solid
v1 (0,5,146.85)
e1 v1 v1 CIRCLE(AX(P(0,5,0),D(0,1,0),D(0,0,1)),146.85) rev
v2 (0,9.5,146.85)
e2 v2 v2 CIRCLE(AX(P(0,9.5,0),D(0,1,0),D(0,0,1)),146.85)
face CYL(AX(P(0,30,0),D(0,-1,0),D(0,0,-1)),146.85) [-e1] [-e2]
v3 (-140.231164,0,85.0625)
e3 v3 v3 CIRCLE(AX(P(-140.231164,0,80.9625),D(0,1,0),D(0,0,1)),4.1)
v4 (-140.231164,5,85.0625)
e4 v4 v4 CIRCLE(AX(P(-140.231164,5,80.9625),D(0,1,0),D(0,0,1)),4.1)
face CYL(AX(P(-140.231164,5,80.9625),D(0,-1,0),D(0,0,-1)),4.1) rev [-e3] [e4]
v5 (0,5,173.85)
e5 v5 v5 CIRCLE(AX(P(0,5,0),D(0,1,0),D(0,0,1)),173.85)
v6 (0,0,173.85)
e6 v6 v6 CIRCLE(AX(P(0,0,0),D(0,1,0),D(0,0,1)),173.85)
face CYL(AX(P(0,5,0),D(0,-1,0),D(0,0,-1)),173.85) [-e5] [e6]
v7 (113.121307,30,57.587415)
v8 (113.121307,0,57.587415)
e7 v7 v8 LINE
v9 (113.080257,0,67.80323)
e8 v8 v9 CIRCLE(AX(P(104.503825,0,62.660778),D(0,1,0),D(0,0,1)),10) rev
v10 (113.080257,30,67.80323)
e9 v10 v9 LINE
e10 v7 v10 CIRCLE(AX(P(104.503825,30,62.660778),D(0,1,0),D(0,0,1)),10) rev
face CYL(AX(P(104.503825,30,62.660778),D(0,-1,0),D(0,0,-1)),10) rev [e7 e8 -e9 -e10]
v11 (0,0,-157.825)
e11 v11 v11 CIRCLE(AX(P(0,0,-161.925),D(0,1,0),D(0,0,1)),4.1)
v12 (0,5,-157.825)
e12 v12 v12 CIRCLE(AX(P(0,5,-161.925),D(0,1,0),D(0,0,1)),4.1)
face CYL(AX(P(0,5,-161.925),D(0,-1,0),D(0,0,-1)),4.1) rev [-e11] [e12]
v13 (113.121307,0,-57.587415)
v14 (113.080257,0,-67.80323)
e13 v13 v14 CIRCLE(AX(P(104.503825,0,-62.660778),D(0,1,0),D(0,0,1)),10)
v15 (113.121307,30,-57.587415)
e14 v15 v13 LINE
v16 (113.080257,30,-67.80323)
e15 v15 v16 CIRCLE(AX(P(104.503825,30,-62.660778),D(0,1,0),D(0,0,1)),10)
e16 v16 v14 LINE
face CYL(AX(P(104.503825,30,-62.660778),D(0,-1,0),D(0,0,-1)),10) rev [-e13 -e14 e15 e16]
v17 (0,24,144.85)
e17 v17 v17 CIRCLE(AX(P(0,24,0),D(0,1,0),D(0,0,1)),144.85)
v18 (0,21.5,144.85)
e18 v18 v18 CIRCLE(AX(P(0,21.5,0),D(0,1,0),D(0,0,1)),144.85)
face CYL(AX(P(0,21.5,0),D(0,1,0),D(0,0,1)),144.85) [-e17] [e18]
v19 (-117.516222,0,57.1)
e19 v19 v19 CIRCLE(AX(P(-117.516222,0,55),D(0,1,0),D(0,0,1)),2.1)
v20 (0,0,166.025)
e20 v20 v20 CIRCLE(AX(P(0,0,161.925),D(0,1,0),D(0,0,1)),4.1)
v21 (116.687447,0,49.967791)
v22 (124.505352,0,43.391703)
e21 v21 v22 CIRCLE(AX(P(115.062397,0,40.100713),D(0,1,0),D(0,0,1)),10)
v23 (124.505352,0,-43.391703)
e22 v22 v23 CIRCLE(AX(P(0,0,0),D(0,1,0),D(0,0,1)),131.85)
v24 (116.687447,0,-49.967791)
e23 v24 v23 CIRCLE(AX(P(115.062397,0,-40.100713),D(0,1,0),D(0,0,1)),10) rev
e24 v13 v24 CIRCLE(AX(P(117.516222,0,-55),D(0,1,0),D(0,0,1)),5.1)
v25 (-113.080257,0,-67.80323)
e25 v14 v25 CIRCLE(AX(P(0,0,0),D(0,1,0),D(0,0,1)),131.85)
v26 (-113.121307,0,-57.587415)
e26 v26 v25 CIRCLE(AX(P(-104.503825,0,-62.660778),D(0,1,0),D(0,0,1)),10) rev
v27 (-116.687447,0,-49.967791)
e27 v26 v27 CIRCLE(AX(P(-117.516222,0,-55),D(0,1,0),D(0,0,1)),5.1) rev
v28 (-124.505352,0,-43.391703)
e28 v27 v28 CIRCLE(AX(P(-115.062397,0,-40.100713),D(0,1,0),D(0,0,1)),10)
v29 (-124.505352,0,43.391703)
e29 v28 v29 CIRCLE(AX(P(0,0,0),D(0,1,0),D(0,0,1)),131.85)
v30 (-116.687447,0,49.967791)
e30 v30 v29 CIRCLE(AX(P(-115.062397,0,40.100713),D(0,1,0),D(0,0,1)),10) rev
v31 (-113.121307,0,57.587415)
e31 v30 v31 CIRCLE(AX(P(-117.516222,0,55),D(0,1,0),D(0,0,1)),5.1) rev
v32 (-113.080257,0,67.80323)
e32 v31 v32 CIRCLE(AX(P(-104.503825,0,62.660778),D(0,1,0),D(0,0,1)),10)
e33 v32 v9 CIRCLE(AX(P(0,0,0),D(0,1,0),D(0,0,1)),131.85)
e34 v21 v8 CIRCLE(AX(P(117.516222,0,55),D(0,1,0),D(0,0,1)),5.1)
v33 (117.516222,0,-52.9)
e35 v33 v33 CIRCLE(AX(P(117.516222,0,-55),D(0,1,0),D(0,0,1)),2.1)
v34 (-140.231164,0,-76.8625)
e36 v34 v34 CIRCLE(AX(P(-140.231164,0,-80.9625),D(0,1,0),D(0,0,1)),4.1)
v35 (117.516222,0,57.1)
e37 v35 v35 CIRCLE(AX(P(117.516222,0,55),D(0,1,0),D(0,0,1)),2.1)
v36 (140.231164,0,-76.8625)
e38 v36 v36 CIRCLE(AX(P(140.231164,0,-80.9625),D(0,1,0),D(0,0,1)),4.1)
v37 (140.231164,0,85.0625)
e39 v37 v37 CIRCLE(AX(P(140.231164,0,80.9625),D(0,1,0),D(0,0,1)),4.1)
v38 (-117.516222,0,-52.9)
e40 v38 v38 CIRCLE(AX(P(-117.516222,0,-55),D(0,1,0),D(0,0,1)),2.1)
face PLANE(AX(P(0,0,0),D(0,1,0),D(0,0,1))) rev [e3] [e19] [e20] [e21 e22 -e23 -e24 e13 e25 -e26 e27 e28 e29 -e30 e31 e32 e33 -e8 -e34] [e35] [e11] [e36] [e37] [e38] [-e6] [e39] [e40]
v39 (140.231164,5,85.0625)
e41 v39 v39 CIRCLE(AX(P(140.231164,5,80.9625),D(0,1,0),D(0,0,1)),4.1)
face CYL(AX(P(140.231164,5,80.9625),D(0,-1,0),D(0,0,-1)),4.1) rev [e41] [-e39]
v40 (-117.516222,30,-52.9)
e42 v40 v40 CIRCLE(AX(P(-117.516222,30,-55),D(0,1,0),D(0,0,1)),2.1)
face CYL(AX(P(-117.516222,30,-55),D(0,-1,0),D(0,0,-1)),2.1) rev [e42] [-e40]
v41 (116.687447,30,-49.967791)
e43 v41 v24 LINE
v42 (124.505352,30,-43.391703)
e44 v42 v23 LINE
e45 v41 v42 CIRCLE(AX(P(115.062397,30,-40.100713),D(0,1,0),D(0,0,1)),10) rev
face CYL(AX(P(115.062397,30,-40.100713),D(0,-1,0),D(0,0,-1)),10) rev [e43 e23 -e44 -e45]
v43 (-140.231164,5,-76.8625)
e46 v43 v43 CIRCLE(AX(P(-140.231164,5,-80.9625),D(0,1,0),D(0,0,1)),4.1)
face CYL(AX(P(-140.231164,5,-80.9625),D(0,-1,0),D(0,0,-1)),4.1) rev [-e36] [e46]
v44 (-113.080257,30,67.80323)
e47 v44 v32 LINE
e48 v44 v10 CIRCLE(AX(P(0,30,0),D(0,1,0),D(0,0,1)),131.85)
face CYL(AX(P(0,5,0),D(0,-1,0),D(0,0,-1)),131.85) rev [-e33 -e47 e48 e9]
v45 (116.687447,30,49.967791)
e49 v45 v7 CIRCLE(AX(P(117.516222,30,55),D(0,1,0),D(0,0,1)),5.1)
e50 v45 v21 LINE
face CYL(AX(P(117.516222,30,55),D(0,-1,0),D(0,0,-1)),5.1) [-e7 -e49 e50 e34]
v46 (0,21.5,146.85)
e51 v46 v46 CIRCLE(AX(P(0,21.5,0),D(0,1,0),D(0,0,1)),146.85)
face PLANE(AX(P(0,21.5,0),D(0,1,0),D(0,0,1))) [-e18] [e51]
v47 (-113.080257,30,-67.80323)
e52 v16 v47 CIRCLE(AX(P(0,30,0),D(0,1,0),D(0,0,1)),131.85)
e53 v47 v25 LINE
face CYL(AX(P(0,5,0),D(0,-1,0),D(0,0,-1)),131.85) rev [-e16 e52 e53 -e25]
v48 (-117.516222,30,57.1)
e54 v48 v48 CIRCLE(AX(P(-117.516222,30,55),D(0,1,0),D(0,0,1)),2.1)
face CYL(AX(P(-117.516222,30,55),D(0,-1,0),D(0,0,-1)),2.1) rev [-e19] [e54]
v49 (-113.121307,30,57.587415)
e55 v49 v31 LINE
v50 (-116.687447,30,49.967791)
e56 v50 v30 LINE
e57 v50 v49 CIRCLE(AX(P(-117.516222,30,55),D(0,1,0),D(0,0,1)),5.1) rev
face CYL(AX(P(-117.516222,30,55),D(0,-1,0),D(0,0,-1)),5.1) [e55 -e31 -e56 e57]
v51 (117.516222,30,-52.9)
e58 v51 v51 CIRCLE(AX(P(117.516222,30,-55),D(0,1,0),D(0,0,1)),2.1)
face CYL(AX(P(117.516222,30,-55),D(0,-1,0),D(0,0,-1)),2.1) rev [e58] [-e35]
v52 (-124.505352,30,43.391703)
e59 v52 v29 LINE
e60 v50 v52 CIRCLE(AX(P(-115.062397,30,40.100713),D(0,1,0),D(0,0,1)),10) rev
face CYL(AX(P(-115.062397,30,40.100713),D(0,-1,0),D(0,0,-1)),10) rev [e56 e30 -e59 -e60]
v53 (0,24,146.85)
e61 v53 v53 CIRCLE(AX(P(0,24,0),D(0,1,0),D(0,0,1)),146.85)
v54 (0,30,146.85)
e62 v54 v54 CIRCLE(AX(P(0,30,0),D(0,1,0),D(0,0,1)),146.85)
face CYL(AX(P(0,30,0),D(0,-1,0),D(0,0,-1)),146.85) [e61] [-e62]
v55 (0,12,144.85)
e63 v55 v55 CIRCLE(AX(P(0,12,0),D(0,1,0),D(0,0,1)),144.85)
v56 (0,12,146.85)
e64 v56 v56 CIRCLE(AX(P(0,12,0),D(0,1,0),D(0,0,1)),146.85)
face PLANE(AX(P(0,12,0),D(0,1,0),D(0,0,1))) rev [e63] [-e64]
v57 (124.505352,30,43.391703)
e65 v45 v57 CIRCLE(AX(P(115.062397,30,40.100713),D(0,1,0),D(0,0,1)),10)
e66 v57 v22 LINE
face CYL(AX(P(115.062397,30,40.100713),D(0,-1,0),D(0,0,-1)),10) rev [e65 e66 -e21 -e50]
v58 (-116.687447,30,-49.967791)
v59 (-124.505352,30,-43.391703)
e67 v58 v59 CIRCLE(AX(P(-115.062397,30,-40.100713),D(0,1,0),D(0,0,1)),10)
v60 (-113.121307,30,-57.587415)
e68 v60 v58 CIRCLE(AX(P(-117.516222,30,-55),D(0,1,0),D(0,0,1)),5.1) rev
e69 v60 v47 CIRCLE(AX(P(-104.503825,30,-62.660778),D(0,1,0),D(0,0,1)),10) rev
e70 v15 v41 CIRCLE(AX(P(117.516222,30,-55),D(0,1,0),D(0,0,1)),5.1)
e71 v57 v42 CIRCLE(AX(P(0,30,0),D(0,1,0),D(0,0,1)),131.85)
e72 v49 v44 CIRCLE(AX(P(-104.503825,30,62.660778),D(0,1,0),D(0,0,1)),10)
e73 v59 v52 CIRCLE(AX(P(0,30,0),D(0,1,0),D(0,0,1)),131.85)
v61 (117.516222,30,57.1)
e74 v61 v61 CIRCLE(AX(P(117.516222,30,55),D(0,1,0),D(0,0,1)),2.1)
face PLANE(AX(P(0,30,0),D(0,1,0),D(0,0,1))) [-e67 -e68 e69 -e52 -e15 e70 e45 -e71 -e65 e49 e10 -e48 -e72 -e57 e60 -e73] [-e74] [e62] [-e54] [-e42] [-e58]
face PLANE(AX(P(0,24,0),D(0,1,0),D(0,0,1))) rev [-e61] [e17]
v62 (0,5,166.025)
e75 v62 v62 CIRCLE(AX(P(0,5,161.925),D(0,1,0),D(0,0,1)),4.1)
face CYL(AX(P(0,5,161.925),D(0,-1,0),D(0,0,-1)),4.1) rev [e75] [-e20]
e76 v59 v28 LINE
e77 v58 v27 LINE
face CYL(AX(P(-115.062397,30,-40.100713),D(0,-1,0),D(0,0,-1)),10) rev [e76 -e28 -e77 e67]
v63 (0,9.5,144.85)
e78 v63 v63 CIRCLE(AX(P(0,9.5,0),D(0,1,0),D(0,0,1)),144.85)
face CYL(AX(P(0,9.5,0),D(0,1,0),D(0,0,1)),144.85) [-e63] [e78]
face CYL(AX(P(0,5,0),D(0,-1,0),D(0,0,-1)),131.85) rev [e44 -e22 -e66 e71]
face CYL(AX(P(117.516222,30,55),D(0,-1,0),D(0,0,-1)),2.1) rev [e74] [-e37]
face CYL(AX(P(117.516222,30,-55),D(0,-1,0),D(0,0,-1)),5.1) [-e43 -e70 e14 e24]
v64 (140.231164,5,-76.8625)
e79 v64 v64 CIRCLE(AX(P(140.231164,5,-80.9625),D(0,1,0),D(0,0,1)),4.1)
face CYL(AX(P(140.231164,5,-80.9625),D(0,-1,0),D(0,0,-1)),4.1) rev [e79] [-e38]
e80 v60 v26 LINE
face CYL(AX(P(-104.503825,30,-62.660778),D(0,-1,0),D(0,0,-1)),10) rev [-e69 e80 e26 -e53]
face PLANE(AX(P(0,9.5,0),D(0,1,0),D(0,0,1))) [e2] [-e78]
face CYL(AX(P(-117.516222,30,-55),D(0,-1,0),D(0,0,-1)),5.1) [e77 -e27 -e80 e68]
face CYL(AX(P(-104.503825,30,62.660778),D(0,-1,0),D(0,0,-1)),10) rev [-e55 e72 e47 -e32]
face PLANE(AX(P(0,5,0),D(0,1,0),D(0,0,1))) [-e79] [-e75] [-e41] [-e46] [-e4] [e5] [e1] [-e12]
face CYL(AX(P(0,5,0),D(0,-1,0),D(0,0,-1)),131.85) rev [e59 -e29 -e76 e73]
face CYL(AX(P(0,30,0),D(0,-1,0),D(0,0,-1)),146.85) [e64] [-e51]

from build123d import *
from build123d.topology import SkipClean

# Parameters (mm, degrees)
SKETCH1_R           = 173.85
SKETCH1_R_2         = 4.1
SKETCH1_R_3         = 131.85
BOSS_EXTRUDE1_DEPTH = 5
SKETCH1_3_R         = 146.85
SKETCH1_3_R_2       = 2.1
BOSS_EXTRUDE2_DEPTH = 30
CUT_EXTRUDE1_START  = 9.5
SKETCH1_4_R         = 146.85
SKETCH1_4_R_2       = 144.85
CUT_EXTRUDE1_DEPTH  = 2.5
CUT_EXTRUDE2_START  = 21.5
SKETCH1_5_R         = 146.85
SKETCH1_5_R_2       = 144.85
CUT_EXTRUDE2_DEPTH  = 2.5


with BuildPart() as part:
    # Sketch1 → Boss-Extrude1 (new body)
    with BuildSketch(Plane(origin=(0, 0, 0), x_dir=(1, 0, 0), z_dir=(0, 1, 0))):
        Circle(SKETCH1_R)
        with Locations((-140.231163508, -80.9625)):
            Circle(SKETCH1_R_2, mode=Mode.SUBTRACT)
        with Locations((0, -161.925)):
            Circle(SKETCH1_R_2, mode=Mode.SUBTRACT)
        with Locations((140.231163508, -80.9625)):
            Circle(SKETCH1_R_2, mode=Mode.SUBTRACT)
        with Locations((-140.231163508, 80.9625)):
            Circle(SKETCH1_R_2, mode=Mode.SUBTRACT)
        with Locations((0, 161.925)):
            Circle(SKETCH1_R_2, mode=Mode.SUBTRACT)
        with Locations((140.231163508, 80.9625)):
            Circle(SKETCH1_R_2, mode=Mode.SUBTRACT)
        Circle(SKETCH1_R_3, mode=Mode.SUBTRACT)
    extrude(amount=BOSS_EXTRUDE1_DEPTH)

    # Sketch1<3> → Boss-Extrude2 (add)
    with BuildSketch(Plane(origin=(0, 0, 0), x_dir=(1, 0, 0), z_dir=(0, 1, 0))):
        Circle(SKETCH1_3_R)
        with BuildLine():
            ThreePointArc((124.505351616, -43.391703343), (121.499509166, -47.753398598), (116.687446985, -49.967790594))
            ThreePointArc((116.687446985, -49.967790594), (112.897087536, -52.838150289), (113.121306631, -57.587415004))
            ThreePointArc((113.121306631, -57.587415004), (114.503744228, -62.700959824), (113.080257044, -67.803229768))
            ThreePointArc((113.080257044, -67.803229768), (0, -131.85), (-113.080257044, -67.803229768))
            ThreePointArc((-113.080257044, -67.803229768), (-114.503744228, -62.700959824), (-113.121306631, -57.587415004))
            ThreePointArc((-113.121306631, -57.587415004), (-112.897087536, -52.838150289), (-116.687446985, -49.967790594))
            ThreePointArc((-116.687446985, -49.967790594), (-121.499509166, -47.753398598), (-124.505351616, -43.391703343))
            ThreePointArc((-124.505351616, -43.391703343), (-131.85, 0), (-124.505351616, 43.391703343))
            ThreePointArc((-124.505351616, 43.391703343), (-121.499509166, 47.753398598), (-116.687446985, 49.967790594))
            ThreePointArc((-116.687446985, 49.967790594), (-112.897087536, 52.838150289), (-113.121306631, 57.587415004))
            ThreePointArc((-113.121306631, 57.587415004), (-114.503744228, 62.700959824), (-113.080257044, 67.803229768))
            ThreePointArc((-113.080257044, 67.803229768), (0, 131.85), (113.080257044, 67.803229768))
            ThreePointArc((113.080257044, 67.803229768), (114.503744228, 62.700959824), (113.121306631, 57.587415004))
            ThreePointArc((113.121306631, 57.587415004), (112.897087536, 52.838150289), (116.687446985, 49.967790594))
            ThreePointArc((116.687446985, 49.967790594), (121.499509166, 47.753398598), (124.505351616, 43.391703343))
            ThreePointArc((124.505351616, 43.391703343), (131.85, 0), (124.505351616, -43.391703343))
        make_face(mode=Mode.SUBTRACT)
        with Locations((117.516222284, 55)):
            Circle(SKETCH1_3_R_2, mode=Mode.SUBTRACT)
        with Locations((-117.516222284, 55)):
            Circle(SKETCH1_3_R_2, mode=Mode.SUBTRACT)
        with Locations((-117.516222284, -55)):
            Circle(SKETCH1_3_R_2, mode=Mode.SUBTRACT)
        with Locations((117.516222284, -55)):
            Circle(SKETCH1_3_R_2, mode=Mode.SUBTRACT)
    extrude(amount=BOSS_EXTRUDE2_DEPTH)

    # Sketch1<4> → Cut-Extrude1 (cut)
    with SkipClean():  # the faces are left unmerged after this step: merging them gives an invalid solid
        with BuildSketch(Plane(origin=(0, 0, 0), x_dir=(1, 0, 0), z_dir=(0, 1, 0)).offset(CUT_EXTRUDE1_START)):
            Circle(SKETCH1_4_R)
            Circle(SKETCH1_4_R_2, mode=Mode.SUBTRACT)
        extrude(amount=CUT_EXTRUDE1_DEPTH, mode=Mode.SUBTRACT)

    # Sketch1<5> → Cut-Extrude2 (cut)
    with SkipClean():  # the faces are left unmerged after this step: merging them gives an invalid solid
        with BuildSketch(Plane(origin=(0, 0, 0), x_dir=(1, 0, 0), z_dir=(0, 1, 0)).offset(CUT_EXTRUDE2_START)):
            Circle(SKETCH1_5_R)
            Circle(SKETCH1_5_R_2, mode=Mode.SUBTRACT)
        extrude(amount=CUT_EXTRUDE2_DEPTH, mode=Mode.SUBTRACT)


solid = part.part
